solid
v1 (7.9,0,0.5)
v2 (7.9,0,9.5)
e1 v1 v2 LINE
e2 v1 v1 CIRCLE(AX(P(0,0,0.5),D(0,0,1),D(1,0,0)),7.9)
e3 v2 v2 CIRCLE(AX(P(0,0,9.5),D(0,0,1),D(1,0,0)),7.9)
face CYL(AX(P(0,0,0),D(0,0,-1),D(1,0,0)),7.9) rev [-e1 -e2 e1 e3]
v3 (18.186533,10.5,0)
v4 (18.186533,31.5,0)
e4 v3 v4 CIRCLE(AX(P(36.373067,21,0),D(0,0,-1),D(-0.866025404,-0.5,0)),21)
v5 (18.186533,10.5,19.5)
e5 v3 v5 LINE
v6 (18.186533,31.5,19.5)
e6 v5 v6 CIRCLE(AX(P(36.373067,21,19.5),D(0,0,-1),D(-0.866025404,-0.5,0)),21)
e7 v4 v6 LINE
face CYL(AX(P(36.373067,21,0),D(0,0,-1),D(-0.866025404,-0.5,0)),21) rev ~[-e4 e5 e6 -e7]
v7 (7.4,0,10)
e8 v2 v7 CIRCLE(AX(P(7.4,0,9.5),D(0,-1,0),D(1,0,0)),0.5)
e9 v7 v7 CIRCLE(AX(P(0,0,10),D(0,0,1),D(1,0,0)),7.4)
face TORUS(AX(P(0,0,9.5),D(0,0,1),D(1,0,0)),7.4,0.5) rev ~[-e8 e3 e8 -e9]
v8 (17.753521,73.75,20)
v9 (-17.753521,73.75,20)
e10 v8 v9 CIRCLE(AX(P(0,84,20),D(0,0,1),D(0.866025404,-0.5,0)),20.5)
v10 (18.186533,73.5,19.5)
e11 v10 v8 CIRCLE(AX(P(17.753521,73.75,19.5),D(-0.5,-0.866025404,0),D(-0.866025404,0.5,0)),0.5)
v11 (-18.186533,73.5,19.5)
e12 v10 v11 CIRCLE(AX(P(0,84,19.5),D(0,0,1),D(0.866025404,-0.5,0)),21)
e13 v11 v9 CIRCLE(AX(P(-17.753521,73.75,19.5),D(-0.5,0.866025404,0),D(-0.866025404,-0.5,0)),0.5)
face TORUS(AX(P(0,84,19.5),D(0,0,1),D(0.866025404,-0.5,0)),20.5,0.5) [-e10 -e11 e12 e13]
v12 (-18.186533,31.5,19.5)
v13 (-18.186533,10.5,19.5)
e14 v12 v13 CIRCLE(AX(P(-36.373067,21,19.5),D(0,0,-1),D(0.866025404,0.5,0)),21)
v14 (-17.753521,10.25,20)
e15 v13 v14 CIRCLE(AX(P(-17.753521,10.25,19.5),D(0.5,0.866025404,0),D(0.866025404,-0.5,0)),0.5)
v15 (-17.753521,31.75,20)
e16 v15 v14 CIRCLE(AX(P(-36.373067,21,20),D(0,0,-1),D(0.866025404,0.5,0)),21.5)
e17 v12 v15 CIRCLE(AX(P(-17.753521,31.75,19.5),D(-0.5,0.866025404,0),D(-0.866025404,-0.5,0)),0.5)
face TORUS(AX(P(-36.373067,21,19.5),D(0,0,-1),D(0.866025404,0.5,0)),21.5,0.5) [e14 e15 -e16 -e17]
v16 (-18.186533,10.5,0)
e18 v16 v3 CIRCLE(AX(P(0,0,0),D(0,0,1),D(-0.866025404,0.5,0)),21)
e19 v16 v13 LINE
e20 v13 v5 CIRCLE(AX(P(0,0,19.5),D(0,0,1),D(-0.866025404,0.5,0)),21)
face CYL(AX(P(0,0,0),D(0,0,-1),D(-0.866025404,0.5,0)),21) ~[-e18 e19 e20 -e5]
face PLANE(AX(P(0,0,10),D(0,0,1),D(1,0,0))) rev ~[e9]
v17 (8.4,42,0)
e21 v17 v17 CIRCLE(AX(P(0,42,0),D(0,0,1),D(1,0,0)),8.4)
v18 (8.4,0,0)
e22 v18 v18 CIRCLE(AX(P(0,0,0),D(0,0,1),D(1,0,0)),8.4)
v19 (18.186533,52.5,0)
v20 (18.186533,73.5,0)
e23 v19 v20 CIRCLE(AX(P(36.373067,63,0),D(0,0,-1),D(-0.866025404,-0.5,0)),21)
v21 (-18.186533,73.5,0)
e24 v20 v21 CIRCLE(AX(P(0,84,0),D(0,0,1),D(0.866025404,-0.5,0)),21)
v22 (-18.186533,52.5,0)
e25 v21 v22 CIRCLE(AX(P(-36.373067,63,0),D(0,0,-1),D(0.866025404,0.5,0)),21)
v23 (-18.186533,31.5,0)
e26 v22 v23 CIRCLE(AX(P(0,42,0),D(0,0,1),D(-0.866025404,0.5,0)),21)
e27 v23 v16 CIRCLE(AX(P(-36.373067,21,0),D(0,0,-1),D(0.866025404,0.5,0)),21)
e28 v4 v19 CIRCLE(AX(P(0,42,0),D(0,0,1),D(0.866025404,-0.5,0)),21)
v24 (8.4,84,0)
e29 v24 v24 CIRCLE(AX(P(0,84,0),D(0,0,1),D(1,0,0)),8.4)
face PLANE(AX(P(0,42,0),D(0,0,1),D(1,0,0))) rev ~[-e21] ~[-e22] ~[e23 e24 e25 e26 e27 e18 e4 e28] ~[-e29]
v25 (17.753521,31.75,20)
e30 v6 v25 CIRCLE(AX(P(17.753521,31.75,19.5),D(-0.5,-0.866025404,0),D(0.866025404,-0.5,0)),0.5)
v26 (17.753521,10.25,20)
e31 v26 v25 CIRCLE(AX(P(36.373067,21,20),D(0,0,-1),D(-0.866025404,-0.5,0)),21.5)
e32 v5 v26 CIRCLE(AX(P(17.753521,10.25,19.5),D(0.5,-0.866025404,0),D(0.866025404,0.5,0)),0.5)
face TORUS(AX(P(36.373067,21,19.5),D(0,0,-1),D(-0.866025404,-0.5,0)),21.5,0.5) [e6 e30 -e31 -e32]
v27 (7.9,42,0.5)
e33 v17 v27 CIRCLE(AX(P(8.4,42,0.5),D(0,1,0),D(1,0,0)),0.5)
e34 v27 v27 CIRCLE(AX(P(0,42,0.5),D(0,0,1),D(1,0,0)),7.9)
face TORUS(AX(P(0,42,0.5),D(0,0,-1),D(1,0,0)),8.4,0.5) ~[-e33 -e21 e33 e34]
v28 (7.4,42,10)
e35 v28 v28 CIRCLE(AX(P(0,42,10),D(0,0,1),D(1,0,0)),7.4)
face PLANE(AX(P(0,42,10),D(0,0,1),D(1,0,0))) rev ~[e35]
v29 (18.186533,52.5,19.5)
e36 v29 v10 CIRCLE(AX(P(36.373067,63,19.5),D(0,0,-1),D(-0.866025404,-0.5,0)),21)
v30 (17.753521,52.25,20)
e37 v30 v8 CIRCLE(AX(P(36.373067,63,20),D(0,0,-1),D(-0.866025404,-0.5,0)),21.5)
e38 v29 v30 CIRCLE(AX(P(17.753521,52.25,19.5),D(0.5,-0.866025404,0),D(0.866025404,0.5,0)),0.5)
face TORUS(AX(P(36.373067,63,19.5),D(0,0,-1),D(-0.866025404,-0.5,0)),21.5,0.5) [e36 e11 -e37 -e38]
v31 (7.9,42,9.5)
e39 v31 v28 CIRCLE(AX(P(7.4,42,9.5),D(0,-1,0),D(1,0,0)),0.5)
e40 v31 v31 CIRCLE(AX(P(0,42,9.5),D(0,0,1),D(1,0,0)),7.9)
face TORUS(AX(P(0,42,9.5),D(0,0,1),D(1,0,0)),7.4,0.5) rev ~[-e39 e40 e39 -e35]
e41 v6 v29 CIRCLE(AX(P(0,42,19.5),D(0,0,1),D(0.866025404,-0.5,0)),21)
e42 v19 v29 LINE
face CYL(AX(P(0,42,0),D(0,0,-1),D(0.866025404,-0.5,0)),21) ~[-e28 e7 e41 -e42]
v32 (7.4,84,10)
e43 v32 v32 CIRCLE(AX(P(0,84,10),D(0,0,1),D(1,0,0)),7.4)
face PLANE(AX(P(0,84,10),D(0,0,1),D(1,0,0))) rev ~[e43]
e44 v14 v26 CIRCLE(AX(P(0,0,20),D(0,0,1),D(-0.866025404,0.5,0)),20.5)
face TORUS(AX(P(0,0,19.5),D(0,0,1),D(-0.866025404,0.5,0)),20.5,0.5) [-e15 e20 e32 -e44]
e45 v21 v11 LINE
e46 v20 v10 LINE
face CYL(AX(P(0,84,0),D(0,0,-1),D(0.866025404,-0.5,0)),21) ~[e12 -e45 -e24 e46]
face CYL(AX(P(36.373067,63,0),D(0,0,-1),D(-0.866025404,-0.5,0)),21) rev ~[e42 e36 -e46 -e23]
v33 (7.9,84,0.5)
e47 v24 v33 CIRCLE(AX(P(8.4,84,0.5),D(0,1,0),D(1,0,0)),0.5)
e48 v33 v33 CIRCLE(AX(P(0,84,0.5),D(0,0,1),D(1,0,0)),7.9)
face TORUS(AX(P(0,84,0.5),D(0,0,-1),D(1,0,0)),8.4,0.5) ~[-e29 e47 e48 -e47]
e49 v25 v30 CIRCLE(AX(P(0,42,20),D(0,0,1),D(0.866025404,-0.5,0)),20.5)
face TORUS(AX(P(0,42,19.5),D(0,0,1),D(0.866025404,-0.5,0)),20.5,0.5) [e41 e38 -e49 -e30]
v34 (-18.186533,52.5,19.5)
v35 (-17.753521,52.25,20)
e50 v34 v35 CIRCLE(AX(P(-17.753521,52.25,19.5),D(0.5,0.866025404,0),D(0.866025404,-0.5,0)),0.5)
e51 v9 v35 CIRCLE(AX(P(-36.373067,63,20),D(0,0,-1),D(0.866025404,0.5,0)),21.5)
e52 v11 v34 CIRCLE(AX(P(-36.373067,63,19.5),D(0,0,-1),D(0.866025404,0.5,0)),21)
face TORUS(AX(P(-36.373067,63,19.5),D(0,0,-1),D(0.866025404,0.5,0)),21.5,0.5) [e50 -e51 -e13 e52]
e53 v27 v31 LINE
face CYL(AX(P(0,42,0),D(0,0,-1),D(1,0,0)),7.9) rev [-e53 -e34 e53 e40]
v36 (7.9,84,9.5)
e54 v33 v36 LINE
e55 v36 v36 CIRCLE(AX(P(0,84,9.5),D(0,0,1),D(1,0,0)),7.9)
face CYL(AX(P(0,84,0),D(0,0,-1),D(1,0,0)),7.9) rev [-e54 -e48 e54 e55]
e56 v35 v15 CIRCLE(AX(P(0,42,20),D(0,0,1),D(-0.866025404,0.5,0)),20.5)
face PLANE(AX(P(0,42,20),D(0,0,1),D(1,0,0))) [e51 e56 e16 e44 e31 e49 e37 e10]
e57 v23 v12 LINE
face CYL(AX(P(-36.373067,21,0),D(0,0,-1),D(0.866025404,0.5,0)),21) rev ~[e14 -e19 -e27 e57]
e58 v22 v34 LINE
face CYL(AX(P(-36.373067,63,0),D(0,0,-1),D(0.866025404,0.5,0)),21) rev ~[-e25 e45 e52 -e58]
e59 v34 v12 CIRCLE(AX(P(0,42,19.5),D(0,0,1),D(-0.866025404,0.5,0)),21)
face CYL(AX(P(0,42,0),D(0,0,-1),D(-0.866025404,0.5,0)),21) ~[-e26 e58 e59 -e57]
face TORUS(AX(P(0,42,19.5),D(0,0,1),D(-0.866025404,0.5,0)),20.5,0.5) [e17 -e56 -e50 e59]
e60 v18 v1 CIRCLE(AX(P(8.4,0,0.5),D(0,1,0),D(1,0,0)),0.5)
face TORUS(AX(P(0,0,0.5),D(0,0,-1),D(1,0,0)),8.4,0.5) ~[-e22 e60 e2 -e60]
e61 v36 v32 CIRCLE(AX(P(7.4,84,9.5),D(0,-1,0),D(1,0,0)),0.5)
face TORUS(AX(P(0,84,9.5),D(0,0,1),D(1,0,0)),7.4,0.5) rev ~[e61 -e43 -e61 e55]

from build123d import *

# Parameters (mm, degrees)
F3_R     = 7.9
F4_DEPTH = 20
F5_DEPTH = 10
F6_R     = 0.5


# Not quite as in the source:
# - a feature names something its author has since deleted; it is built from what else it names


with BuildPart() as f4:
    # F3 (on Top) → F4 (new body)
    with BuildSketch(Plane.XY):
        with BuildLine():
            ThreePointArc((18.1865334795, 10.5), (15.3730669589, 21), (18.1865334795, 31.5))
            ThreePointArc((18.1865334795, 31.5), (21, 42), (18.1865334795, 52.5))
            ThreePointArc((18.1865334795, 52.5), (15.3730669589, 63), (18.1865334795, 73.5))
            ThreePointArc((18.1865334795, 73.5), (0, 105), (-18.1865334795, 73.5))
            ThreePointArc((-18.1865334795, 73.5), (-15.3730669589, 63), (-18.1865334795, 52.5))
            ThreePointArc((-18.1865334795, 52.5), (-21, 42), (-18.1865334795, 31.5))
            ThreePointArc((-18.1865334795, 31.5), (-15.3730669589, 21), (-18.1865334795, 10.5))
            ThreePointArc((-18.1865334795, 10.5), (0, -21), (18.1865334795, 10.5))
        make_face()
        Circle(F3_R, mode=Mode.SUBTRACT)
        with Locations((0, 42)):
            Circle(F3_R, mode=Mode.SUBTRACT)
        with Locations((0, 84)):
            Circle(F3_R, mode=Mode.SUBTRACT)
        with Locations((0, 42)):
            Circle(F3_R)
        Circle(F3_R)
        with Locations((0, 84)):
            Circle(F3_R)
    extrude(amount=F4_DEPTH)

    # F3 (on Top) → F5 (cut)
    with BuildSketch(Plane.XY):
        with Locations((0, 42)):
            Circle(F3_R)
        Circle(F3_R)
        with Locations((0, 84)):
            Circle(F3_R)
    extrude(amount=F5_DEPTH, mode=Mode.SUBTRACT)

    # F6
    f6_edges = [f4.edges().sort_by_distance(p)[0] for p in [
        (-7.9, 42, 0),
        (-7.9, 42, 10),
        (-7.9, 0, 0),
        (-7.9, 0, 10),
        (21, 42, 20),
        (-7.9, 84, 10),
        (-7.9, 84, 0),
        (15.373067, 21, 20),
        (0, -21, 20),
        (15.373067, 63, 20),
        (0, 105, 20),
        (-15.373067, 63, 20),
        (-21, 42, 20),
        (-15.373067, 21, 20),
    ]]
    fillet(f6_edges, radius=F6_R)


solid = f4.part
